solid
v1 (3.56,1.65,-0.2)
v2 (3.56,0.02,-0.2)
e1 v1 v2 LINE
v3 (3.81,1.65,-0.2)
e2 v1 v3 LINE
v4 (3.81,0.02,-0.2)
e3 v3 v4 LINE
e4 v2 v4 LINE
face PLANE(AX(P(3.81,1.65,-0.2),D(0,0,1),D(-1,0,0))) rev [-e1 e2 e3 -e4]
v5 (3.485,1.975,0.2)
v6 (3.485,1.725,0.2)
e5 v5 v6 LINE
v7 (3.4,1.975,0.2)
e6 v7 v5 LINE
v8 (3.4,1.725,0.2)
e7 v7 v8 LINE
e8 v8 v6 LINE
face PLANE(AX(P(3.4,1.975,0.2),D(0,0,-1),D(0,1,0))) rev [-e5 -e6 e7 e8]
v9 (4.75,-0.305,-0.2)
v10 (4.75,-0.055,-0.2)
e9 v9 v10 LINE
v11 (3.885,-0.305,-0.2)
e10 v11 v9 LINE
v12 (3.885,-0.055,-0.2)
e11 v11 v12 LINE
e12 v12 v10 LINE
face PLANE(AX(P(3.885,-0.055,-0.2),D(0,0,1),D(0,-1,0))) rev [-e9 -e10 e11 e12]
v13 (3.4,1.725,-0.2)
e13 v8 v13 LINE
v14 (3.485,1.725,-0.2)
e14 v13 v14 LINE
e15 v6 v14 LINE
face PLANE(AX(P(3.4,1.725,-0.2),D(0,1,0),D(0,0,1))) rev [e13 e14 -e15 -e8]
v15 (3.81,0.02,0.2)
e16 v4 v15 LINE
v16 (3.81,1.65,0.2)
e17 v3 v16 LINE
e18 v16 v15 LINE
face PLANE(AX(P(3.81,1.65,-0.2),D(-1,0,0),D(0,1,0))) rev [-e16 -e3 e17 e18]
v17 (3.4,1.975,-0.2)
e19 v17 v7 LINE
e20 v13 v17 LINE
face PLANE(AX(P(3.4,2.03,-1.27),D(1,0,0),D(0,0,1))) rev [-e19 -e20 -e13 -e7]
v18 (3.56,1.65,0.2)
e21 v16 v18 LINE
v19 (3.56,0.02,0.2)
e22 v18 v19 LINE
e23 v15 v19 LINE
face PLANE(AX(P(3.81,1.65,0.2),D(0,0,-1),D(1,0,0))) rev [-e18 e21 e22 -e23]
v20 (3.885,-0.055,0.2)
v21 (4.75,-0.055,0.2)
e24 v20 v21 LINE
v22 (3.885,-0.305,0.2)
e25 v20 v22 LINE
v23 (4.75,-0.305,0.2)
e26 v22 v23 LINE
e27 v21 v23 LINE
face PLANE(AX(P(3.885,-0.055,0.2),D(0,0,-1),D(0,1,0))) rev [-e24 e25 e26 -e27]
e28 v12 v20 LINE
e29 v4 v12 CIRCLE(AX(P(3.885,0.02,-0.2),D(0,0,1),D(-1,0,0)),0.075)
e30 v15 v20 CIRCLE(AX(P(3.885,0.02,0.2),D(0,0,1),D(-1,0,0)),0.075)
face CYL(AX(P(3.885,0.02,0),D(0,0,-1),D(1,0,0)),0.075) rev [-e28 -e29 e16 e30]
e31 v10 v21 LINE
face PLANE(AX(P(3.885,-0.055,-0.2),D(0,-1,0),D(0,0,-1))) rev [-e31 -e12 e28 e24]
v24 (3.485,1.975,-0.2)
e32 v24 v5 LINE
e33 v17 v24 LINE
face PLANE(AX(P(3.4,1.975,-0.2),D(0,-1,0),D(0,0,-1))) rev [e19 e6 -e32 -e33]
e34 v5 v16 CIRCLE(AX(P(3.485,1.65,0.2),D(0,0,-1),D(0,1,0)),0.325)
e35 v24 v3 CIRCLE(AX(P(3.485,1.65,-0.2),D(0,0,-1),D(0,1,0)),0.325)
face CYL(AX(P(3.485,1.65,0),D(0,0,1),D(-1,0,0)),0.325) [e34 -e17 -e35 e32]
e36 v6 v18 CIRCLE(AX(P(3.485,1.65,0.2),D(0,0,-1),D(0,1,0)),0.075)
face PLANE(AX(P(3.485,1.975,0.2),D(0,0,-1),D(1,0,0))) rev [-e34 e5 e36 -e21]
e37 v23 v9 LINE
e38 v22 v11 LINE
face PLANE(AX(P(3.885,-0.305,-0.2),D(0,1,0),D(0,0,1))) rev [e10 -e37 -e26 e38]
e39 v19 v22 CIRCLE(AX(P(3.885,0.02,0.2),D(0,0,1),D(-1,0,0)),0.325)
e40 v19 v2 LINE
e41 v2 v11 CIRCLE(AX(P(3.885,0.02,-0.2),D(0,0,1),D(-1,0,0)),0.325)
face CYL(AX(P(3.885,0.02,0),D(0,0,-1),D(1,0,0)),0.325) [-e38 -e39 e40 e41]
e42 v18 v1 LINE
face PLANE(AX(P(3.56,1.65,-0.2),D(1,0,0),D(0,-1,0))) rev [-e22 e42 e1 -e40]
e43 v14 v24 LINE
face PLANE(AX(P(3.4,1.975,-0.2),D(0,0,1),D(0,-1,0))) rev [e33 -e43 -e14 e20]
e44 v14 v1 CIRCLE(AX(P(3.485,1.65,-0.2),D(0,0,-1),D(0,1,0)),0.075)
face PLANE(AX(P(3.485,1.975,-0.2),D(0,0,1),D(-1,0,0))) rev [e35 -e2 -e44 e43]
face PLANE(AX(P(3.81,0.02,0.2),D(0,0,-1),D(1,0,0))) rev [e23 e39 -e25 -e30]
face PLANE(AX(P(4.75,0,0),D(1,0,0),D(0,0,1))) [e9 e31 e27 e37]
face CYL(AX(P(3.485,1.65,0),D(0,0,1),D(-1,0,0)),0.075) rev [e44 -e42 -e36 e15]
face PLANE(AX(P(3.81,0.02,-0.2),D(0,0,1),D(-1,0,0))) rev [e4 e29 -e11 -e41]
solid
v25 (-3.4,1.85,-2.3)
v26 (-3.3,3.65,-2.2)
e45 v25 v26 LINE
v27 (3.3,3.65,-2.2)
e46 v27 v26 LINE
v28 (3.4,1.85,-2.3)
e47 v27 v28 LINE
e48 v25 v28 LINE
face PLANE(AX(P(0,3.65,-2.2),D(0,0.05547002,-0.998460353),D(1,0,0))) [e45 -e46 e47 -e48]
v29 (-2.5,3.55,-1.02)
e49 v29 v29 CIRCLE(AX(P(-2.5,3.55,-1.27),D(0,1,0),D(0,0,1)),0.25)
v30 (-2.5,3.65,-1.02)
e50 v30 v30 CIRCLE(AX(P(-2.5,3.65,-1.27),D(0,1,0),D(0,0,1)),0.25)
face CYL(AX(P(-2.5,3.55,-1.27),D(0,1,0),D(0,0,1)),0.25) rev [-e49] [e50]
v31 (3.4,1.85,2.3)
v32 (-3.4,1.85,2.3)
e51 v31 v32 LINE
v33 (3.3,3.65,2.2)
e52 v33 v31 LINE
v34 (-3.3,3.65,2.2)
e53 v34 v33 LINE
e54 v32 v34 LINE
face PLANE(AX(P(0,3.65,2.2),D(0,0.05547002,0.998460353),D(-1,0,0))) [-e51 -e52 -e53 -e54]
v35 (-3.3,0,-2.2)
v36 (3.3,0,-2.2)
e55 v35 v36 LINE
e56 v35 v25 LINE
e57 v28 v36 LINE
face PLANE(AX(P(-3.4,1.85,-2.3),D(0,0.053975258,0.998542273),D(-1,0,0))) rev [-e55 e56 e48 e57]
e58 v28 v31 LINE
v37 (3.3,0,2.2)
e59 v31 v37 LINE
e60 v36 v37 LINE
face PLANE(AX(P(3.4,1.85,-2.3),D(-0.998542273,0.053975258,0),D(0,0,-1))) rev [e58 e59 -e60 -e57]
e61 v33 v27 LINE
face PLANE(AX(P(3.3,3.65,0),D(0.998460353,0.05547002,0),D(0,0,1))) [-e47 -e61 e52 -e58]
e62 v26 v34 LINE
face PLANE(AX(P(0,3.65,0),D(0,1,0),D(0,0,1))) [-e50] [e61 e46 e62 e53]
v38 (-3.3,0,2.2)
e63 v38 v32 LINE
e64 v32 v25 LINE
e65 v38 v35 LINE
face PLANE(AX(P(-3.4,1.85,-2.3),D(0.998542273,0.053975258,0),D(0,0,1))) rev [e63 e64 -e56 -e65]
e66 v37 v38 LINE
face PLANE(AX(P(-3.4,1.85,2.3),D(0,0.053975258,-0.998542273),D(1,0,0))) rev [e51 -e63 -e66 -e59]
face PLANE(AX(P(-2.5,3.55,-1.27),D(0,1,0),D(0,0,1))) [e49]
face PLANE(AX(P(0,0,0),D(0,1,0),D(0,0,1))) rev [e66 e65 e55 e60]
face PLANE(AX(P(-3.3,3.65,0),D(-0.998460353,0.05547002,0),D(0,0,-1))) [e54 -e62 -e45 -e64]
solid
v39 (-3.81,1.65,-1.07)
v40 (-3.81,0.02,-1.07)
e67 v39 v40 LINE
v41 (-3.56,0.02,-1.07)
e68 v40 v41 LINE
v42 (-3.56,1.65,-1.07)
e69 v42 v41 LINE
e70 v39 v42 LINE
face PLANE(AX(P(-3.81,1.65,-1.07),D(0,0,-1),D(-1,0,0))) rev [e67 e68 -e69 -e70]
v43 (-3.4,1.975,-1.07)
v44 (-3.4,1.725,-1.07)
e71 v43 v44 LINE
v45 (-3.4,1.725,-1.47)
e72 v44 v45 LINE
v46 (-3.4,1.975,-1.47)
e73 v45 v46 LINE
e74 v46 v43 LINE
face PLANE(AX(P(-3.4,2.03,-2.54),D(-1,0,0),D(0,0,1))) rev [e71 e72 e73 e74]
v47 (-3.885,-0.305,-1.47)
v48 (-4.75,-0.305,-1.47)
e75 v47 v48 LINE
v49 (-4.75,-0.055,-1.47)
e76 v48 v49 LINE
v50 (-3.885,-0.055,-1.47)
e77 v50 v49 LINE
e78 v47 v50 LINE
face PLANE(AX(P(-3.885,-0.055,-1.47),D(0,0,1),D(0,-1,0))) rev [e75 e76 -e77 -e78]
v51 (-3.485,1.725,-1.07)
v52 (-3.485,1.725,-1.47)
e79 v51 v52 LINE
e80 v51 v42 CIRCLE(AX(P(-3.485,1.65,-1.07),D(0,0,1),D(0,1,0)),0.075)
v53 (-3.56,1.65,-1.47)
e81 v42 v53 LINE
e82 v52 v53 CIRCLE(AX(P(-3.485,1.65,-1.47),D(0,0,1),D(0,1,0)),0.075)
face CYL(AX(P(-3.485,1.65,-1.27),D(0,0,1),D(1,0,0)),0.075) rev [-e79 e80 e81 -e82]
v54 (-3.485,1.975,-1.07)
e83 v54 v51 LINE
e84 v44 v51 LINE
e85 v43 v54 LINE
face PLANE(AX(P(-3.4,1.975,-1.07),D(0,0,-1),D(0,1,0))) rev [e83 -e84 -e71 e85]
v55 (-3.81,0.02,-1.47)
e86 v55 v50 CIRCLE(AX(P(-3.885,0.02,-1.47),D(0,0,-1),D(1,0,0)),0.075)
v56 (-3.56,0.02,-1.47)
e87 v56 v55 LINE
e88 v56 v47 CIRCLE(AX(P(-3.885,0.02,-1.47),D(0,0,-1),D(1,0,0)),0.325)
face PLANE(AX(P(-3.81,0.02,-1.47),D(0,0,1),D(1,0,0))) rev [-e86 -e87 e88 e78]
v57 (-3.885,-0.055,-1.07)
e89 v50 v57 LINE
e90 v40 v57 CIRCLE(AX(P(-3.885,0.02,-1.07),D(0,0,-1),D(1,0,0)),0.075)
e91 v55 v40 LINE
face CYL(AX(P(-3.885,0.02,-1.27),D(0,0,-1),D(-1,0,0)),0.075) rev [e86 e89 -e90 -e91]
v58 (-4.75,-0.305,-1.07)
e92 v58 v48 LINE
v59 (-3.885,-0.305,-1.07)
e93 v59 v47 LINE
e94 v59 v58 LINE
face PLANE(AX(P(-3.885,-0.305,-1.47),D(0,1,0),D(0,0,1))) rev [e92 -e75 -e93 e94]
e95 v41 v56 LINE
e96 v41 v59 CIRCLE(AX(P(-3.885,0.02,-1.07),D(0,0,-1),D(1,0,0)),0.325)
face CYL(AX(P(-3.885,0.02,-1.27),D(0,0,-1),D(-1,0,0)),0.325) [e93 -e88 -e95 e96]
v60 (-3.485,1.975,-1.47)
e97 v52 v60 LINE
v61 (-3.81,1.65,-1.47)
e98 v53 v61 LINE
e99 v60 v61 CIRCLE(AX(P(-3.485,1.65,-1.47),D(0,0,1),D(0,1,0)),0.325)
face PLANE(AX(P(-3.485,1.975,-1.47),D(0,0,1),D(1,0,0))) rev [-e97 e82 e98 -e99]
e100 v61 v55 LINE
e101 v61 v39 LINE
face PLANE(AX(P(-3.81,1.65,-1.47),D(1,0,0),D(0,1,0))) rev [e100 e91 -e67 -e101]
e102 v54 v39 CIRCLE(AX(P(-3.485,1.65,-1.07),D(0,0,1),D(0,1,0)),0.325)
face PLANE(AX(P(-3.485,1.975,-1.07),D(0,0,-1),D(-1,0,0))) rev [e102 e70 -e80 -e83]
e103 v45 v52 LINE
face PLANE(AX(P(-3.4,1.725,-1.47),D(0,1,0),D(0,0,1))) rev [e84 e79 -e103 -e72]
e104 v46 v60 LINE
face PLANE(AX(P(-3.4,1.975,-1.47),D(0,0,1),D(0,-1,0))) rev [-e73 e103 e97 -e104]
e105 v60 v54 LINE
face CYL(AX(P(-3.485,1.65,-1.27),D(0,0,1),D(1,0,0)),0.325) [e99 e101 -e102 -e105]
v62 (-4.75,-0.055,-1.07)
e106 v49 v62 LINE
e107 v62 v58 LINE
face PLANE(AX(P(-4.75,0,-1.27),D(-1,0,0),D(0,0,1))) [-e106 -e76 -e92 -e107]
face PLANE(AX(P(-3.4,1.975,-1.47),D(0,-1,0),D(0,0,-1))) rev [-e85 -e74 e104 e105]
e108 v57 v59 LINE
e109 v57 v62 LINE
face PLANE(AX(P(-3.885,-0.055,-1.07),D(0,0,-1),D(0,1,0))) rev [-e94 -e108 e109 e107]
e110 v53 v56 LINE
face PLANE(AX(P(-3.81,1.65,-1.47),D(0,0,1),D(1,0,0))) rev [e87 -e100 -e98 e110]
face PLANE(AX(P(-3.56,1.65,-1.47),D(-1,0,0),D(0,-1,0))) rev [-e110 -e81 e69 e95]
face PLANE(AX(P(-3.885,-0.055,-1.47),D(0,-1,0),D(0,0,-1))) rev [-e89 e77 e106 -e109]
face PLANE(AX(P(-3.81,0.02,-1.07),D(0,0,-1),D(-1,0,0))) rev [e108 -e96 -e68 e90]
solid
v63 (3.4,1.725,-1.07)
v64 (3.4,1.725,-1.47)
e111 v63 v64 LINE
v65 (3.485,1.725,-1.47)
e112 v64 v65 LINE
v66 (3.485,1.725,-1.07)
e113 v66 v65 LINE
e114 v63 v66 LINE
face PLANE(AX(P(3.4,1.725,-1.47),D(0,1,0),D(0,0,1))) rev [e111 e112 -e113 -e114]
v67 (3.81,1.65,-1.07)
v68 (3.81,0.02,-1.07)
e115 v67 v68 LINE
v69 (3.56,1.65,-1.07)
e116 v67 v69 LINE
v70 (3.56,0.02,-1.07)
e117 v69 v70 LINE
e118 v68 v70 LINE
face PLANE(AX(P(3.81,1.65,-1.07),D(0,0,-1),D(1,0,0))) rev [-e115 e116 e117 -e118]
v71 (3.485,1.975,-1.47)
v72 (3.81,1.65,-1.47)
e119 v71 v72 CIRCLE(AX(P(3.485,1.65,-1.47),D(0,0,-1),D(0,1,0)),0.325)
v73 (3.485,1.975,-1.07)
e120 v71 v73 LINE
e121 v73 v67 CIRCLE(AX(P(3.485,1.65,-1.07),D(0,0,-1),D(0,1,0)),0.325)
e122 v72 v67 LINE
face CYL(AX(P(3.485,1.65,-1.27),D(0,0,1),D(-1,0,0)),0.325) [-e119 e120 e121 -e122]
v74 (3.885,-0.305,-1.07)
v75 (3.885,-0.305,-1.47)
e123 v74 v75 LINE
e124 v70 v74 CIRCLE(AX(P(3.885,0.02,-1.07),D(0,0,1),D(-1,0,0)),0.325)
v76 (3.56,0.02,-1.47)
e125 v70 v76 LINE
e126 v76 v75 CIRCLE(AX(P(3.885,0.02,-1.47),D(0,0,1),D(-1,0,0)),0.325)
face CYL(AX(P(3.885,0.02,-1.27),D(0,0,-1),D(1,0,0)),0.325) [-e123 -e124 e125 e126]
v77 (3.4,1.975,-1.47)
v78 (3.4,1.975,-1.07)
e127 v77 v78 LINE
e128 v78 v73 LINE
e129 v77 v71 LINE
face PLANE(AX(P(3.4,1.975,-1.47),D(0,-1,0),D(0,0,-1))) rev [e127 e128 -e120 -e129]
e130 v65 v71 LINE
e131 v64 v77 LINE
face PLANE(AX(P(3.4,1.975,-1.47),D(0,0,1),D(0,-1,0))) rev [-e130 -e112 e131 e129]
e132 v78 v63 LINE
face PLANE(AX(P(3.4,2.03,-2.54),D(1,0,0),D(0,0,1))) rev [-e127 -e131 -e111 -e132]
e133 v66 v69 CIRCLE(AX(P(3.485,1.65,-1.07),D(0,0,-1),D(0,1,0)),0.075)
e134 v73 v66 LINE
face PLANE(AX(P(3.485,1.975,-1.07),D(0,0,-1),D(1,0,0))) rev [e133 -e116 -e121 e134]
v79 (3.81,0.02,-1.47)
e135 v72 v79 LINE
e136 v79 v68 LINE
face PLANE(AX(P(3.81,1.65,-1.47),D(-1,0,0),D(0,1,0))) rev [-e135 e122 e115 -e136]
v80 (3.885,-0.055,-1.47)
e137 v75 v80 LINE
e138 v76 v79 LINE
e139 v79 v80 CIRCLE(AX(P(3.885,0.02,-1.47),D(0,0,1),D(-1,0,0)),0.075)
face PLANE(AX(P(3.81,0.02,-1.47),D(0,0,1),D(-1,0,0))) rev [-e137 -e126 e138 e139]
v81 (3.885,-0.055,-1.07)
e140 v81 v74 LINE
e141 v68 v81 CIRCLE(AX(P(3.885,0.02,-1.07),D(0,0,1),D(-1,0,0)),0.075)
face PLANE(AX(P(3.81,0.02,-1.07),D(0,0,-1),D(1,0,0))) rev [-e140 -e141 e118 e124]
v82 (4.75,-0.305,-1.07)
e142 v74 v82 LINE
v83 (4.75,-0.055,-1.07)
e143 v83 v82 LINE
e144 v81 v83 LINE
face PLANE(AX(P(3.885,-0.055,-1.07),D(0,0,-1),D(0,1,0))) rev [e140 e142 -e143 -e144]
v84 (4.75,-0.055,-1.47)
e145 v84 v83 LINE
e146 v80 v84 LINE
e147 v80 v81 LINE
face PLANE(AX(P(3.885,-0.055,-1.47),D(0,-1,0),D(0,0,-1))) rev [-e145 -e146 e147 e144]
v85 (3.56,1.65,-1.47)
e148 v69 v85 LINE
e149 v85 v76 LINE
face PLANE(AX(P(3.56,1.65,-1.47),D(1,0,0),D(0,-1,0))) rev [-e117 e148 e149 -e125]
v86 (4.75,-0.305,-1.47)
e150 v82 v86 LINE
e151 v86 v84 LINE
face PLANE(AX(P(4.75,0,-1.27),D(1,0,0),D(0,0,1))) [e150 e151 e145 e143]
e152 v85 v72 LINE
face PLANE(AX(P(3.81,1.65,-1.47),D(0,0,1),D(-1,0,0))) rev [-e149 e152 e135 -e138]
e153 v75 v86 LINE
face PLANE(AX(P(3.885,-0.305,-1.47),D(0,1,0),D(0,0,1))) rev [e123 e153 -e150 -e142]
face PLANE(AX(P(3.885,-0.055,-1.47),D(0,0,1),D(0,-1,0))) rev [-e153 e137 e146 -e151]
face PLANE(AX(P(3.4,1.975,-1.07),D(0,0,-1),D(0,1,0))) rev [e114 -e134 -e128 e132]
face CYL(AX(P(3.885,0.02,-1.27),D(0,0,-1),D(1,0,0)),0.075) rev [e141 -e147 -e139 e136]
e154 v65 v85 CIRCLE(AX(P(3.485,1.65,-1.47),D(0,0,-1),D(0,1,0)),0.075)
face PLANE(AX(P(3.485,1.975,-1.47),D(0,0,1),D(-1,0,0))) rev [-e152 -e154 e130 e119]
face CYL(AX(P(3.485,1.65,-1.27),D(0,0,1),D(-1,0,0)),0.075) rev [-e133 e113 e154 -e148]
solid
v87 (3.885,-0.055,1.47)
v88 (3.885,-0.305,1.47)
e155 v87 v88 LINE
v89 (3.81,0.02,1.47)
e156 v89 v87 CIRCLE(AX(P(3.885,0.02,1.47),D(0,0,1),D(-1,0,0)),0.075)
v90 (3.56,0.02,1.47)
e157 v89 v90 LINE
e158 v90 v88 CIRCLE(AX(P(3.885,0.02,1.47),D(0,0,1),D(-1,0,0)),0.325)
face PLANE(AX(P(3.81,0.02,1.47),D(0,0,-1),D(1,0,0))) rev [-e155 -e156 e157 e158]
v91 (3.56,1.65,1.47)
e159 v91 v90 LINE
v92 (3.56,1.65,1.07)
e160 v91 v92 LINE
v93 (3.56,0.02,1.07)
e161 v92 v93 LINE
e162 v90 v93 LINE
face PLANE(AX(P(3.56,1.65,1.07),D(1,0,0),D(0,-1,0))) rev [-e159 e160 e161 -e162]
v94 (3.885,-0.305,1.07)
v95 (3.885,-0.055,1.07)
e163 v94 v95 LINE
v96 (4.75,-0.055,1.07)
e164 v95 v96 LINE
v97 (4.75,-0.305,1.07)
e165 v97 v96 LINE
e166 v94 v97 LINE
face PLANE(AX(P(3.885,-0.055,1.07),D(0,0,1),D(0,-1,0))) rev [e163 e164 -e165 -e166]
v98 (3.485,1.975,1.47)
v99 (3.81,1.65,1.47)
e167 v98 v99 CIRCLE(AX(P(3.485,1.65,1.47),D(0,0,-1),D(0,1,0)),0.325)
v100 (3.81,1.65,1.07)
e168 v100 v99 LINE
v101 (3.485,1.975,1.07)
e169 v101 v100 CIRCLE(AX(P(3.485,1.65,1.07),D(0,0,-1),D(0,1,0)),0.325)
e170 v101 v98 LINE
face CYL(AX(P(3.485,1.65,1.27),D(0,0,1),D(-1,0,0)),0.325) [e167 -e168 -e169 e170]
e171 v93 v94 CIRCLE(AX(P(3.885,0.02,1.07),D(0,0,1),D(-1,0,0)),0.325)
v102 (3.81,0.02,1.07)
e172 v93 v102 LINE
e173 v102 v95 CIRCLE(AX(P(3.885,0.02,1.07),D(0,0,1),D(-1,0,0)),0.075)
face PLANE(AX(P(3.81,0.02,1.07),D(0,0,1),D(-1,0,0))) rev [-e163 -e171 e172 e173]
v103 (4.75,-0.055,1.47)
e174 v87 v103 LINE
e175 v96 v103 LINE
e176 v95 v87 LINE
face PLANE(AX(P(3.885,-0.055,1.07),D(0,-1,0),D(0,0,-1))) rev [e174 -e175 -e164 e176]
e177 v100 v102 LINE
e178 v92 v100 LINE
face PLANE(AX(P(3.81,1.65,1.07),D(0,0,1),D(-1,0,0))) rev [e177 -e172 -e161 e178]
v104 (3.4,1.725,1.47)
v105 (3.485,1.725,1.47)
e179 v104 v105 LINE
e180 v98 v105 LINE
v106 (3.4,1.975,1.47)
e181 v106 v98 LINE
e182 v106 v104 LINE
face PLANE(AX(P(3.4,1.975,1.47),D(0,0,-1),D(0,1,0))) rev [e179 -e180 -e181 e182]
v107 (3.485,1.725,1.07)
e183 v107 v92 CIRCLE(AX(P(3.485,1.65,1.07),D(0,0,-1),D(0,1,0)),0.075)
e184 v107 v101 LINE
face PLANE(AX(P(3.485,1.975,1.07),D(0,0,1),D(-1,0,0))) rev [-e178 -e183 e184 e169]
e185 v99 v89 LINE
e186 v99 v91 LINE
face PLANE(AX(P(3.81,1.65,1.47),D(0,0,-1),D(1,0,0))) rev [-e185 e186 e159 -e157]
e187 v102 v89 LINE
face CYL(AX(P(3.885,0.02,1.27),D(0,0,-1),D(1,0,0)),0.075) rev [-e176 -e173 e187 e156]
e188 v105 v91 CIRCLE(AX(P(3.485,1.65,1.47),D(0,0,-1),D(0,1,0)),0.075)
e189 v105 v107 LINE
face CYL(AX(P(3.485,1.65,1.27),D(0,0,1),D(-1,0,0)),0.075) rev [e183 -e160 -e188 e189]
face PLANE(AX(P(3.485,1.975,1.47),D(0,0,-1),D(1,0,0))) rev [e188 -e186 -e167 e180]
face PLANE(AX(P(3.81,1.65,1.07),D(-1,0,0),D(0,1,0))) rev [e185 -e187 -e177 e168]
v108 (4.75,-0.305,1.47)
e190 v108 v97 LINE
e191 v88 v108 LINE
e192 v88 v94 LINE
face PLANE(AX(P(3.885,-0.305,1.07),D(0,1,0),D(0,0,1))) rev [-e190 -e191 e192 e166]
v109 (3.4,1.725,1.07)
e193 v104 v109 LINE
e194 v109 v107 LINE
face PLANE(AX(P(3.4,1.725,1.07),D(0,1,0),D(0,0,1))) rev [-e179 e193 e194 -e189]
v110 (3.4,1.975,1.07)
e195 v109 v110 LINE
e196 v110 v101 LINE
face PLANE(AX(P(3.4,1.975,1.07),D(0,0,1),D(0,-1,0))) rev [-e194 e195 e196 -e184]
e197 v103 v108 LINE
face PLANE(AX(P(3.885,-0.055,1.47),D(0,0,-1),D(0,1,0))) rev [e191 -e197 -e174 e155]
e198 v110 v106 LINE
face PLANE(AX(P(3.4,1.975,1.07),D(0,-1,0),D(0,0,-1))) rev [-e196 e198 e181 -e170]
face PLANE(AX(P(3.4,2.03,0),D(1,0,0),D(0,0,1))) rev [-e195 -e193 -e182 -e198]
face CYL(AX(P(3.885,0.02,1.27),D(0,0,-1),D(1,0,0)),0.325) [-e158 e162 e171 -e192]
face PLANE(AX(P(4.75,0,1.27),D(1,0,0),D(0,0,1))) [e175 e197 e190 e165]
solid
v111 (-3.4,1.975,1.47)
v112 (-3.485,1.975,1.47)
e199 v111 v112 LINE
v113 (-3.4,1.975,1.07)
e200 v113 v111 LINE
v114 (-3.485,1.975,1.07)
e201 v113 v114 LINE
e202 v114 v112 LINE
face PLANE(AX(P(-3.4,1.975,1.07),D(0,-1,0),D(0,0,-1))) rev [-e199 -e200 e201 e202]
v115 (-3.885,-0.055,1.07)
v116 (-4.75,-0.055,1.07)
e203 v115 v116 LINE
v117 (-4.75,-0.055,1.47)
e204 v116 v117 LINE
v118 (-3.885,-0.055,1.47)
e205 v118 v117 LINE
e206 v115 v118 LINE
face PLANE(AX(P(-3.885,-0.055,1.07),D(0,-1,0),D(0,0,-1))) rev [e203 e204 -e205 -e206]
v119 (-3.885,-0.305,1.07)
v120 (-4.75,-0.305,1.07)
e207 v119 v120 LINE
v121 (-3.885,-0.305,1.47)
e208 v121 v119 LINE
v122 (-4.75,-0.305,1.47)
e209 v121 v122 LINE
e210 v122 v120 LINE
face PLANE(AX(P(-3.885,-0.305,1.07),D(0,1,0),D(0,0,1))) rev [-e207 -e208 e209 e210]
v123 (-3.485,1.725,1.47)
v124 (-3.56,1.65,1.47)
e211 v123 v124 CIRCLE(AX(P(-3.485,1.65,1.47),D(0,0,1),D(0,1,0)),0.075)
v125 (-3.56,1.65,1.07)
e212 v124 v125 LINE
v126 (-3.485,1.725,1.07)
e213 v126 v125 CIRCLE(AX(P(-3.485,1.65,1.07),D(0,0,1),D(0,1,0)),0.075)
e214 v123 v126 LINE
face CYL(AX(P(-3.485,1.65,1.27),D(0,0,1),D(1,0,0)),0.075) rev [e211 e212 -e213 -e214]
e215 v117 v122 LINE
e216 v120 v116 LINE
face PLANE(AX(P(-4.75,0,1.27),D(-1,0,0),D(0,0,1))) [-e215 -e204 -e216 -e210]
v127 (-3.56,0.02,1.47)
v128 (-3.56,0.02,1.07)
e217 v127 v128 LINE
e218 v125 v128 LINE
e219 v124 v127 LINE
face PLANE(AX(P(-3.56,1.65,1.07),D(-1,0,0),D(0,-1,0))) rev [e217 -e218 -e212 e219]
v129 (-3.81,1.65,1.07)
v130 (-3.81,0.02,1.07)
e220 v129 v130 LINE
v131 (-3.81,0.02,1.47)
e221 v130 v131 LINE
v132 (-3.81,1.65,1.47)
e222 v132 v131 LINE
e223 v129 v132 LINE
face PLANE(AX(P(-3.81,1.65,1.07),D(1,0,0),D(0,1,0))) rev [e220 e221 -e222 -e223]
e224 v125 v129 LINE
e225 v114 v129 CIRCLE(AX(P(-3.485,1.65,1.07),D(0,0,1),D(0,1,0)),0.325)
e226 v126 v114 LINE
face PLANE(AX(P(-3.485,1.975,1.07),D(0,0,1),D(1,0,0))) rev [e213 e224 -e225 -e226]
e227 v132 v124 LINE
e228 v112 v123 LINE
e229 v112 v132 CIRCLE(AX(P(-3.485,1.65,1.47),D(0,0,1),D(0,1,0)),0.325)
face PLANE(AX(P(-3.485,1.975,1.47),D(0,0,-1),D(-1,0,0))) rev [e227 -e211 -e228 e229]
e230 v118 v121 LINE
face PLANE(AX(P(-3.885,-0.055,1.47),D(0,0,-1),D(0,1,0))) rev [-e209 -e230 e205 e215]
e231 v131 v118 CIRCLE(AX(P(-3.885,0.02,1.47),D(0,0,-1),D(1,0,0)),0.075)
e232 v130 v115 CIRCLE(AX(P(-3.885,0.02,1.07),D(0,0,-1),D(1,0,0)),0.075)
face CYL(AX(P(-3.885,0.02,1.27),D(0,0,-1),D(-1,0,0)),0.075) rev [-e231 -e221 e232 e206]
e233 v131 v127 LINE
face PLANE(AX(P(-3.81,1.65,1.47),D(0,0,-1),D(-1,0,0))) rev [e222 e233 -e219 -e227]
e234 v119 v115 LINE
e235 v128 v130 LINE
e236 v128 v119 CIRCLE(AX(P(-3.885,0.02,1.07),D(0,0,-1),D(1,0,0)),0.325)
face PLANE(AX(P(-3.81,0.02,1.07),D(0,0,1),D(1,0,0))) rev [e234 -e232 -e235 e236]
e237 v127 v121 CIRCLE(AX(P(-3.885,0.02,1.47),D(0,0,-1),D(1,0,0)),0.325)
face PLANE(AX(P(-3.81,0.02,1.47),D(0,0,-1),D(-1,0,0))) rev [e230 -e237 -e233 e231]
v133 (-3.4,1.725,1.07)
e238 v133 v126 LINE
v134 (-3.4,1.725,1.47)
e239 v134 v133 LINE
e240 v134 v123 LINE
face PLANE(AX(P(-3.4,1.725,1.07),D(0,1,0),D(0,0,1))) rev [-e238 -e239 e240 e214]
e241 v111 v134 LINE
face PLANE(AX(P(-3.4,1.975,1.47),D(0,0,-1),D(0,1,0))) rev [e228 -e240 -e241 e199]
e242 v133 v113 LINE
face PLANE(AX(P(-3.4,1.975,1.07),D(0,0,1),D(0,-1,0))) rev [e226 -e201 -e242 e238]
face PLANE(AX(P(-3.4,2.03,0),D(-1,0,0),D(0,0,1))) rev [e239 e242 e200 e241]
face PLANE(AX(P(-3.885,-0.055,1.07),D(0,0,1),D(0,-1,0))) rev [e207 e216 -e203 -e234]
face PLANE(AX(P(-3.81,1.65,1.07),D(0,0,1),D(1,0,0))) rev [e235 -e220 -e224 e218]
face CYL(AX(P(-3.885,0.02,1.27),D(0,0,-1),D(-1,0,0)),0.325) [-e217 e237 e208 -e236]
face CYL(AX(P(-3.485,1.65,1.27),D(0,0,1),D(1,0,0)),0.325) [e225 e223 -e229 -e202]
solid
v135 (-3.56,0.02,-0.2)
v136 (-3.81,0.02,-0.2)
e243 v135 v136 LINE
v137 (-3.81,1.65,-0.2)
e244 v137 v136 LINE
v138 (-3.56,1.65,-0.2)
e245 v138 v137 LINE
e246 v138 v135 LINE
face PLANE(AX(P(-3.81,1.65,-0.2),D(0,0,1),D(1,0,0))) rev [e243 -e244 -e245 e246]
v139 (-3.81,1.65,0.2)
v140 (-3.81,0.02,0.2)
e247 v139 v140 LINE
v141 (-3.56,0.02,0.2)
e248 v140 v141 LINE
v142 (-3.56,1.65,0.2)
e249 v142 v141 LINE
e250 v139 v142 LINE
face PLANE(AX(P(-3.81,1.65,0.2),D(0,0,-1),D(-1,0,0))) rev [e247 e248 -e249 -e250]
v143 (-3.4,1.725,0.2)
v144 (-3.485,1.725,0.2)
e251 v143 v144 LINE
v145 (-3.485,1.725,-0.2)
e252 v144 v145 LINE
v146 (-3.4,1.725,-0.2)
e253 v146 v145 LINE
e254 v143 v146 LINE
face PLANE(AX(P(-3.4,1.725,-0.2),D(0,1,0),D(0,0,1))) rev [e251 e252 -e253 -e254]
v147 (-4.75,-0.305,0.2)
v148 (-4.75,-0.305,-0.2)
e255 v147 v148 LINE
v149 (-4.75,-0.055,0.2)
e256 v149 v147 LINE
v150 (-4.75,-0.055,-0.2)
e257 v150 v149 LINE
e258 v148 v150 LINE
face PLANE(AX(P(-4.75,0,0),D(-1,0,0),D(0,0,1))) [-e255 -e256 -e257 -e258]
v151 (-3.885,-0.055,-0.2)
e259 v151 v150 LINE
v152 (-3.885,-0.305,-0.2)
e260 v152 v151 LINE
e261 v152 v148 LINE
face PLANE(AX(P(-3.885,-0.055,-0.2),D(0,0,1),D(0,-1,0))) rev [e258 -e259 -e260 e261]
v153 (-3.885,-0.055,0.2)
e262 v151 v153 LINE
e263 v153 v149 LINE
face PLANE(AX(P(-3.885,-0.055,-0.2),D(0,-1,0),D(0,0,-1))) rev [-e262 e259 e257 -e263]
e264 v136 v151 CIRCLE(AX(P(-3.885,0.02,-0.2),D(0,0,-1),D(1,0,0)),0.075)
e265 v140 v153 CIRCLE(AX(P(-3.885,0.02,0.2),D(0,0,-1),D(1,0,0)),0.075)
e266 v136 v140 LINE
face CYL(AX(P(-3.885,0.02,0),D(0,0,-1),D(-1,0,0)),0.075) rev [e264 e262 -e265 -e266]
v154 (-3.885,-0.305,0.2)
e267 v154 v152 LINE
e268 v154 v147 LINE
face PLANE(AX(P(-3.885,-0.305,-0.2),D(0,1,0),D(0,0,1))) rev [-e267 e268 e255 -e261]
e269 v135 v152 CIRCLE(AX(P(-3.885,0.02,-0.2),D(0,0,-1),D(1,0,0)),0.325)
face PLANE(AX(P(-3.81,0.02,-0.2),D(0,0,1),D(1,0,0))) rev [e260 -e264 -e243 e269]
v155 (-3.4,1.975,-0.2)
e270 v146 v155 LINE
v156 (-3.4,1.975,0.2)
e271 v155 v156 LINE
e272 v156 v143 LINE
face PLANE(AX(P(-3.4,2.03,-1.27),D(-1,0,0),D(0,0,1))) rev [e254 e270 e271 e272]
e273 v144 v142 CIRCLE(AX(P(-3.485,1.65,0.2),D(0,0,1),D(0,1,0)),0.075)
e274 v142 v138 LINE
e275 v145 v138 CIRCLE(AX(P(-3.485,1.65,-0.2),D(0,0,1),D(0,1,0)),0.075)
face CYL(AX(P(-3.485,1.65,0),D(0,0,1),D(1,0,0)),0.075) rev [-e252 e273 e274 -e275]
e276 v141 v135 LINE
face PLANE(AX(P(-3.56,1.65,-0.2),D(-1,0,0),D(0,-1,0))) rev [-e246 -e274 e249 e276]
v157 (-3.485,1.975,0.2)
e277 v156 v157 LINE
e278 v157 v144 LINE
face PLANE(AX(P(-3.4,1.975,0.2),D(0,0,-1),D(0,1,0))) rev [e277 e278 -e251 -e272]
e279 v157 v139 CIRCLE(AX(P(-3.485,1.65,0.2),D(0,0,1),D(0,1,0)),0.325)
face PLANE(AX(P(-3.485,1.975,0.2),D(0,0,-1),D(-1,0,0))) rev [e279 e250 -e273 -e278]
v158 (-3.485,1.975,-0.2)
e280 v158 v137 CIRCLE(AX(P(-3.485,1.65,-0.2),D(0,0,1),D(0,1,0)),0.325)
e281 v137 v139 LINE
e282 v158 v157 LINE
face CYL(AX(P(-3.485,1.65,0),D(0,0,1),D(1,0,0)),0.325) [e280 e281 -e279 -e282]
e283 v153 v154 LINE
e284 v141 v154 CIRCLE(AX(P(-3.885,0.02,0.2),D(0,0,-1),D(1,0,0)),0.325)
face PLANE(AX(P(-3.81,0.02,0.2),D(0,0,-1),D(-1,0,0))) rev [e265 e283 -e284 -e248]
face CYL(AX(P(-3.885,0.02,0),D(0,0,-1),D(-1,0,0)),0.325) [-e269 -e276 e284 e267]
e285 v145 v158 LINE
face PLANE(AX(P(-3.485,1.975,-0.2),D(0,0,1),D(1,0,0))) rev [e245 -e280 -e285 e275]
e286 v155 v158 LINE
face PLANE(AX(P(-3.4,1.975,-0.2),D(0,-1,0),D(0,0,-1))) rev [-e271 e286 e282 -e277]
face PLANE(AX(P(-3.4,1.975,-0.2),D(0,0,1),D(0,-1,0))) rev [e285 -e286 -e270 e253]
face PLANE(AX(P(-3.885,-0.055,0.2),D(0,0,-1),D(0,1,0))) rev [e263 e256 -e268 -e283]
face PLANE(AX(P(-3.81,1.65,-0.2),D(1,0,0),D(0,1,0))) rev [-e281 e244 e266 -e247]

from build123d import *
from OCP.BRepFilletAPI import BRepFilletAPI_MakeChamfer

# Parameters (mm, degrees)
SKETCH_1_W                = 6.8
SKETCH_1_H                = 4.6
EXTRUDE_292_DEPTH         = 3.65
CHAMFER_365_SIZE          = 1.8
CHAMFER_365_SIZE2         = 0.1
CHAMFER_503_SIZE          = 1.85
CHAMFER_503_SIZE_2        = 0.1
ESBO_O6_W                 = 0.4
ESBO_O6_H                 = 0.25
PATTERN_LINEAR_1113_COUNT = 3
PATTERN_LINEAR_1113_PITCH = 1.27
SKETCH_11_R               = 0.25
CUT_EXTRUDE_1_DEPTH       = 0.1


with BuildPart() as part:
    # Эскиз1 → Extrude 292 (new body)
    with BuildSketch(Plane(origin=(0, 0, 0), x_dir=(1, 0, 0), z_dir=(0, 1, 0))):
        Rectangle(SKETCH_1_W, SKETCH_1_H)
    extrude(amount=EXTRUDE_292_DEPTH)

    # Chamfer 365: one chamfer whose edges measure the first distance from different faces: ONE call of the kernel's chamfer builder (chamfer() names one face for all edges)
    chamfer_365_edges_1 = [part.edges().sort_by_distance(p)[0] for p in [
        (-3.4, 3.65, 0),
    ]]
    chamfer_365_side_1 = [part.faces().sort_by_distance(p)[0] for p in [
        (-3.4, 1.825, 0),
    ]]
    chamfer_365_edges_2 = [part.edges().sort_by_distance(p)[0] for p in [
        (0, 3.65, 2.3),
    ]]
    chamfer_365_side_2 = [part.faces().sort_by_distance(p)[0] for p in [
        (0, 1.825, 2.3),
    ]]
    chamfer_365_edges_3 = [part.edges().sort_by_distance(p)[0] for p in [
        (3.4, 3.65, 0),
    ]]
    chamfer_365_side_3 = [part.faces().sort_by_distance(p)[0] for p in [
        (3.4, 1.825, 0),
    ]]
    chamfer_365_edges_4 = [part.edges().sort_by_distance(p)[0] for p in [
        (0, 3.65, -2.3),
    ]]
    chamfer_365_side_4 = [part.faces().sort_by_distance(p)[0] for p in [
        (0, 1.825, -2.3),
    ]]
    chamfer_365 = BRepFilletAPI_MakeChamfer(part.part.solid().wrapped)
    for e in chamfer_365_edges_1:
        chamfer_365.Add(CHAMFER_365_SIZE, CHAMFER_365_SIZE2, e.wrapped, chamfer_365_side_1[0].wrapped)  # the first distance lies on this face
    for e in chamfer_365_edges_2:
        chamfer_365.Add(CHAMFER_365_SIZE, CHAMFER_365_SIZE2, e.wrapped, chamfer_365_side_2[0].wrapped)  # the first distance lies on this face
    for e in chamfer_365_edges_3:
        chamfer_365.Add(CHAMFER_365_SIZE, CHAMFER_365_SIZE2, e.wrapped, chamfer_365_side_3[0].wrapped)  # the first distance lies on this face
    for e in chamfer_365_edges_4:
        chamfer_365.Add(CHAMFER_365_SIZE, CHAMFER_365_SIZE2, e.wrapped, chamfer_365_side_4[0].wrapped)  # the first distance lies on this face
    add(Compound.cast(chamfer_365.Shape()), mode=Mode.REPLACE)

    # Chamfer 503
    chamfer_503_edges_1 = [part.edges().sort_by_distance(p)[0] for p in [
        (-3.4, 0, 0),
    ]]
    chamfer_503_side_1 = [part.faces().sort_by_distance(p)[0] for p in [
        (-3.4, 0.002, 0),
    ]]
    chamfer_503_edges_2 = [part.edges().sort_by_distance(p)[0] for p in [
        (0, 0, -2.3),
    ]]
    chamfer_503_side_2 = [part.faces().sort_by_distance(p)[0] for p in [
        (0, 0.002, -2.3),
    ]]
    chamfer_503_edges_3 = [part.edges().sort_by_distance(p)[0] for p in [
        (3.4, 0, 0),
    ]]
    chamfer_503_side_3 = [part.faces().sort_by_distance(p)[0] for p in [
        (3.398, 0, 0),
    ]]
    chamfer_503_edges_4 = [part.edges().sort_by_distance(p)[0] for p in [
        (0, 0, 2.3),
    ]]
    chamfer_503_side_4 = [part.faces().sort_by_distance(p)[0] for p in [
        (0, 0, 2.298),
    ]]
    chamfer_503 = BRepFilletAPI_MakeChamfer(part.part.solid().wrapped)
    for e in chamfer_503_edges_1:
        chamfer_503.Add(CHAMFER_503_SIZE - 0.0001, CHAMFER_503_SIZE_2 - 0.0001, e.wrapped, chamfer_503_side_1[0].wrapped)
    for e in chamfer_503_edges_2:
        chamfer_503.Add(CHAMFER_503_SIZE - 0.0001, CHAMFER_503_SIZE_2 - 0.0001, e.wrapped, chamfer_503_side_2[0].wrapped)
    for e in chamfer_503_edges_3:
        chamfer_503.Add(CHAMFER_503_SIZE_2 - 0.0001, CHAMFER_503_SIZE - 0.0001, e.wrapped, chamfer_503_side_3[0].wrapped)
    for e in chamfer_503_edges_4:
        chamfer_503.Add(CHAMFER_503_SIZE_2 - 0.0001, CHAMFER_503_SIZE - 0.0001, e.wrapped, chamfer_503_side_4[0].wrapped)
    add(Compound.cast(chamfer_503.Shape()), mode=Mode.REPLACE)  # a hair under: the kernel refuses the full size

    # Эскиз11 → Вырез метка 1 ножки (cut)
    with BuildSketch(Plane(origin=(0, 3.65, 0), x_dir=(1, 0, 0), z_dir=(0, 1, 0))):
        with Locations(Location((-2.5, 1.27, 0), (0, 0, 270))):
            Circle(SKETCH_11_R)
    extrude(amount=-CUT_EXTRUDE_1_DEPTH, mode=Mode.SUBTRACT)


with BuildPart() as body_2:
    # Sweep 758: sweep along a path in Esboço2
    with BuildLine(Plane.XY) as sweep_758_path:
        Line((-3.4, 1.85), (-3.485, 1.85))
        ThreePointArc((-3.485, 1.85), (-3.626421356, 1.791421356), (-3.685, 1.65))
        Line((-3.685, 1.65), (-3.685, 0.02))
        ThreePointArc((-3.685, 0.02), (-3.743578644, -0.121421356), (-3.885, -0.18))
        Line((-3.885, -0.18), (-4.75, -0.18))
    # Esboço6 → Sweep 758 (sweep)
    with BuildSketch(Plane(origin=(-4.75, 0, 0), x_dir=(0, 0, -1), z_dir=(1, 0, 0))):
        with Locations((0, -0.18)):
            Rectangle(ESBO_O6_W, ESBO_O6_H)
    sweep(path=sweep_758_path.line)


with BuildPart() as body_2_1:
    # Move Face 801: read off the stored shape, not the designer's step
    # Move Face 801: moved
    add(body_2.part.moved(Location((0, 0, 1.27))))


with BuildPart() as pattern_linear_1113_1:
    # Pattern Linear 1113: pattern copy
    add(body_2_1.part.moved(Location(Vector(0, 0, -1) * (1 * PATTERN_LINEAR_1113_PITCH))))


with BuildPart() as pattern_linear_1113_2:
    # Pattern Linear 1113: pattern copy
    add(body_2_1.part.moved(Location(Vector(0, 0, -1) * (2 * PATTERN_LINEAR_1113_PITCH))))


with BuildPart() as body_5:
    # Mirror 1204: mirrored copy
    add(body_2_1.part.mirror(Plane(origin=(0, 0, 0), x_dir=(0, 0, 1), z_dir=(1, 0, 0))))


with BuildPart() as body_6:
    # Mirror 1204 2: mirrored copy
    add(pattern_linear_1113_1.part.mirror(Plane(origin=(0, 0, 0), x_dir=(0, 0, 1), z_dir=(1, 0, 0))))


with BuildPart() as body_7:
    # Mirror 1204 3: mirrored copy
    add(pattern_linear_1113_2.part.mirror(Plane(origin=(0, 0, 0), x_dir=(0, 0, 1), z_dir=(1, 0, 0))))


solid = Compound([part.part, body_2_1.part, pattern_linear_1113_1.part, pattern_linear_1113_2.part, body_5.part, body_6.part, body_7.part])
